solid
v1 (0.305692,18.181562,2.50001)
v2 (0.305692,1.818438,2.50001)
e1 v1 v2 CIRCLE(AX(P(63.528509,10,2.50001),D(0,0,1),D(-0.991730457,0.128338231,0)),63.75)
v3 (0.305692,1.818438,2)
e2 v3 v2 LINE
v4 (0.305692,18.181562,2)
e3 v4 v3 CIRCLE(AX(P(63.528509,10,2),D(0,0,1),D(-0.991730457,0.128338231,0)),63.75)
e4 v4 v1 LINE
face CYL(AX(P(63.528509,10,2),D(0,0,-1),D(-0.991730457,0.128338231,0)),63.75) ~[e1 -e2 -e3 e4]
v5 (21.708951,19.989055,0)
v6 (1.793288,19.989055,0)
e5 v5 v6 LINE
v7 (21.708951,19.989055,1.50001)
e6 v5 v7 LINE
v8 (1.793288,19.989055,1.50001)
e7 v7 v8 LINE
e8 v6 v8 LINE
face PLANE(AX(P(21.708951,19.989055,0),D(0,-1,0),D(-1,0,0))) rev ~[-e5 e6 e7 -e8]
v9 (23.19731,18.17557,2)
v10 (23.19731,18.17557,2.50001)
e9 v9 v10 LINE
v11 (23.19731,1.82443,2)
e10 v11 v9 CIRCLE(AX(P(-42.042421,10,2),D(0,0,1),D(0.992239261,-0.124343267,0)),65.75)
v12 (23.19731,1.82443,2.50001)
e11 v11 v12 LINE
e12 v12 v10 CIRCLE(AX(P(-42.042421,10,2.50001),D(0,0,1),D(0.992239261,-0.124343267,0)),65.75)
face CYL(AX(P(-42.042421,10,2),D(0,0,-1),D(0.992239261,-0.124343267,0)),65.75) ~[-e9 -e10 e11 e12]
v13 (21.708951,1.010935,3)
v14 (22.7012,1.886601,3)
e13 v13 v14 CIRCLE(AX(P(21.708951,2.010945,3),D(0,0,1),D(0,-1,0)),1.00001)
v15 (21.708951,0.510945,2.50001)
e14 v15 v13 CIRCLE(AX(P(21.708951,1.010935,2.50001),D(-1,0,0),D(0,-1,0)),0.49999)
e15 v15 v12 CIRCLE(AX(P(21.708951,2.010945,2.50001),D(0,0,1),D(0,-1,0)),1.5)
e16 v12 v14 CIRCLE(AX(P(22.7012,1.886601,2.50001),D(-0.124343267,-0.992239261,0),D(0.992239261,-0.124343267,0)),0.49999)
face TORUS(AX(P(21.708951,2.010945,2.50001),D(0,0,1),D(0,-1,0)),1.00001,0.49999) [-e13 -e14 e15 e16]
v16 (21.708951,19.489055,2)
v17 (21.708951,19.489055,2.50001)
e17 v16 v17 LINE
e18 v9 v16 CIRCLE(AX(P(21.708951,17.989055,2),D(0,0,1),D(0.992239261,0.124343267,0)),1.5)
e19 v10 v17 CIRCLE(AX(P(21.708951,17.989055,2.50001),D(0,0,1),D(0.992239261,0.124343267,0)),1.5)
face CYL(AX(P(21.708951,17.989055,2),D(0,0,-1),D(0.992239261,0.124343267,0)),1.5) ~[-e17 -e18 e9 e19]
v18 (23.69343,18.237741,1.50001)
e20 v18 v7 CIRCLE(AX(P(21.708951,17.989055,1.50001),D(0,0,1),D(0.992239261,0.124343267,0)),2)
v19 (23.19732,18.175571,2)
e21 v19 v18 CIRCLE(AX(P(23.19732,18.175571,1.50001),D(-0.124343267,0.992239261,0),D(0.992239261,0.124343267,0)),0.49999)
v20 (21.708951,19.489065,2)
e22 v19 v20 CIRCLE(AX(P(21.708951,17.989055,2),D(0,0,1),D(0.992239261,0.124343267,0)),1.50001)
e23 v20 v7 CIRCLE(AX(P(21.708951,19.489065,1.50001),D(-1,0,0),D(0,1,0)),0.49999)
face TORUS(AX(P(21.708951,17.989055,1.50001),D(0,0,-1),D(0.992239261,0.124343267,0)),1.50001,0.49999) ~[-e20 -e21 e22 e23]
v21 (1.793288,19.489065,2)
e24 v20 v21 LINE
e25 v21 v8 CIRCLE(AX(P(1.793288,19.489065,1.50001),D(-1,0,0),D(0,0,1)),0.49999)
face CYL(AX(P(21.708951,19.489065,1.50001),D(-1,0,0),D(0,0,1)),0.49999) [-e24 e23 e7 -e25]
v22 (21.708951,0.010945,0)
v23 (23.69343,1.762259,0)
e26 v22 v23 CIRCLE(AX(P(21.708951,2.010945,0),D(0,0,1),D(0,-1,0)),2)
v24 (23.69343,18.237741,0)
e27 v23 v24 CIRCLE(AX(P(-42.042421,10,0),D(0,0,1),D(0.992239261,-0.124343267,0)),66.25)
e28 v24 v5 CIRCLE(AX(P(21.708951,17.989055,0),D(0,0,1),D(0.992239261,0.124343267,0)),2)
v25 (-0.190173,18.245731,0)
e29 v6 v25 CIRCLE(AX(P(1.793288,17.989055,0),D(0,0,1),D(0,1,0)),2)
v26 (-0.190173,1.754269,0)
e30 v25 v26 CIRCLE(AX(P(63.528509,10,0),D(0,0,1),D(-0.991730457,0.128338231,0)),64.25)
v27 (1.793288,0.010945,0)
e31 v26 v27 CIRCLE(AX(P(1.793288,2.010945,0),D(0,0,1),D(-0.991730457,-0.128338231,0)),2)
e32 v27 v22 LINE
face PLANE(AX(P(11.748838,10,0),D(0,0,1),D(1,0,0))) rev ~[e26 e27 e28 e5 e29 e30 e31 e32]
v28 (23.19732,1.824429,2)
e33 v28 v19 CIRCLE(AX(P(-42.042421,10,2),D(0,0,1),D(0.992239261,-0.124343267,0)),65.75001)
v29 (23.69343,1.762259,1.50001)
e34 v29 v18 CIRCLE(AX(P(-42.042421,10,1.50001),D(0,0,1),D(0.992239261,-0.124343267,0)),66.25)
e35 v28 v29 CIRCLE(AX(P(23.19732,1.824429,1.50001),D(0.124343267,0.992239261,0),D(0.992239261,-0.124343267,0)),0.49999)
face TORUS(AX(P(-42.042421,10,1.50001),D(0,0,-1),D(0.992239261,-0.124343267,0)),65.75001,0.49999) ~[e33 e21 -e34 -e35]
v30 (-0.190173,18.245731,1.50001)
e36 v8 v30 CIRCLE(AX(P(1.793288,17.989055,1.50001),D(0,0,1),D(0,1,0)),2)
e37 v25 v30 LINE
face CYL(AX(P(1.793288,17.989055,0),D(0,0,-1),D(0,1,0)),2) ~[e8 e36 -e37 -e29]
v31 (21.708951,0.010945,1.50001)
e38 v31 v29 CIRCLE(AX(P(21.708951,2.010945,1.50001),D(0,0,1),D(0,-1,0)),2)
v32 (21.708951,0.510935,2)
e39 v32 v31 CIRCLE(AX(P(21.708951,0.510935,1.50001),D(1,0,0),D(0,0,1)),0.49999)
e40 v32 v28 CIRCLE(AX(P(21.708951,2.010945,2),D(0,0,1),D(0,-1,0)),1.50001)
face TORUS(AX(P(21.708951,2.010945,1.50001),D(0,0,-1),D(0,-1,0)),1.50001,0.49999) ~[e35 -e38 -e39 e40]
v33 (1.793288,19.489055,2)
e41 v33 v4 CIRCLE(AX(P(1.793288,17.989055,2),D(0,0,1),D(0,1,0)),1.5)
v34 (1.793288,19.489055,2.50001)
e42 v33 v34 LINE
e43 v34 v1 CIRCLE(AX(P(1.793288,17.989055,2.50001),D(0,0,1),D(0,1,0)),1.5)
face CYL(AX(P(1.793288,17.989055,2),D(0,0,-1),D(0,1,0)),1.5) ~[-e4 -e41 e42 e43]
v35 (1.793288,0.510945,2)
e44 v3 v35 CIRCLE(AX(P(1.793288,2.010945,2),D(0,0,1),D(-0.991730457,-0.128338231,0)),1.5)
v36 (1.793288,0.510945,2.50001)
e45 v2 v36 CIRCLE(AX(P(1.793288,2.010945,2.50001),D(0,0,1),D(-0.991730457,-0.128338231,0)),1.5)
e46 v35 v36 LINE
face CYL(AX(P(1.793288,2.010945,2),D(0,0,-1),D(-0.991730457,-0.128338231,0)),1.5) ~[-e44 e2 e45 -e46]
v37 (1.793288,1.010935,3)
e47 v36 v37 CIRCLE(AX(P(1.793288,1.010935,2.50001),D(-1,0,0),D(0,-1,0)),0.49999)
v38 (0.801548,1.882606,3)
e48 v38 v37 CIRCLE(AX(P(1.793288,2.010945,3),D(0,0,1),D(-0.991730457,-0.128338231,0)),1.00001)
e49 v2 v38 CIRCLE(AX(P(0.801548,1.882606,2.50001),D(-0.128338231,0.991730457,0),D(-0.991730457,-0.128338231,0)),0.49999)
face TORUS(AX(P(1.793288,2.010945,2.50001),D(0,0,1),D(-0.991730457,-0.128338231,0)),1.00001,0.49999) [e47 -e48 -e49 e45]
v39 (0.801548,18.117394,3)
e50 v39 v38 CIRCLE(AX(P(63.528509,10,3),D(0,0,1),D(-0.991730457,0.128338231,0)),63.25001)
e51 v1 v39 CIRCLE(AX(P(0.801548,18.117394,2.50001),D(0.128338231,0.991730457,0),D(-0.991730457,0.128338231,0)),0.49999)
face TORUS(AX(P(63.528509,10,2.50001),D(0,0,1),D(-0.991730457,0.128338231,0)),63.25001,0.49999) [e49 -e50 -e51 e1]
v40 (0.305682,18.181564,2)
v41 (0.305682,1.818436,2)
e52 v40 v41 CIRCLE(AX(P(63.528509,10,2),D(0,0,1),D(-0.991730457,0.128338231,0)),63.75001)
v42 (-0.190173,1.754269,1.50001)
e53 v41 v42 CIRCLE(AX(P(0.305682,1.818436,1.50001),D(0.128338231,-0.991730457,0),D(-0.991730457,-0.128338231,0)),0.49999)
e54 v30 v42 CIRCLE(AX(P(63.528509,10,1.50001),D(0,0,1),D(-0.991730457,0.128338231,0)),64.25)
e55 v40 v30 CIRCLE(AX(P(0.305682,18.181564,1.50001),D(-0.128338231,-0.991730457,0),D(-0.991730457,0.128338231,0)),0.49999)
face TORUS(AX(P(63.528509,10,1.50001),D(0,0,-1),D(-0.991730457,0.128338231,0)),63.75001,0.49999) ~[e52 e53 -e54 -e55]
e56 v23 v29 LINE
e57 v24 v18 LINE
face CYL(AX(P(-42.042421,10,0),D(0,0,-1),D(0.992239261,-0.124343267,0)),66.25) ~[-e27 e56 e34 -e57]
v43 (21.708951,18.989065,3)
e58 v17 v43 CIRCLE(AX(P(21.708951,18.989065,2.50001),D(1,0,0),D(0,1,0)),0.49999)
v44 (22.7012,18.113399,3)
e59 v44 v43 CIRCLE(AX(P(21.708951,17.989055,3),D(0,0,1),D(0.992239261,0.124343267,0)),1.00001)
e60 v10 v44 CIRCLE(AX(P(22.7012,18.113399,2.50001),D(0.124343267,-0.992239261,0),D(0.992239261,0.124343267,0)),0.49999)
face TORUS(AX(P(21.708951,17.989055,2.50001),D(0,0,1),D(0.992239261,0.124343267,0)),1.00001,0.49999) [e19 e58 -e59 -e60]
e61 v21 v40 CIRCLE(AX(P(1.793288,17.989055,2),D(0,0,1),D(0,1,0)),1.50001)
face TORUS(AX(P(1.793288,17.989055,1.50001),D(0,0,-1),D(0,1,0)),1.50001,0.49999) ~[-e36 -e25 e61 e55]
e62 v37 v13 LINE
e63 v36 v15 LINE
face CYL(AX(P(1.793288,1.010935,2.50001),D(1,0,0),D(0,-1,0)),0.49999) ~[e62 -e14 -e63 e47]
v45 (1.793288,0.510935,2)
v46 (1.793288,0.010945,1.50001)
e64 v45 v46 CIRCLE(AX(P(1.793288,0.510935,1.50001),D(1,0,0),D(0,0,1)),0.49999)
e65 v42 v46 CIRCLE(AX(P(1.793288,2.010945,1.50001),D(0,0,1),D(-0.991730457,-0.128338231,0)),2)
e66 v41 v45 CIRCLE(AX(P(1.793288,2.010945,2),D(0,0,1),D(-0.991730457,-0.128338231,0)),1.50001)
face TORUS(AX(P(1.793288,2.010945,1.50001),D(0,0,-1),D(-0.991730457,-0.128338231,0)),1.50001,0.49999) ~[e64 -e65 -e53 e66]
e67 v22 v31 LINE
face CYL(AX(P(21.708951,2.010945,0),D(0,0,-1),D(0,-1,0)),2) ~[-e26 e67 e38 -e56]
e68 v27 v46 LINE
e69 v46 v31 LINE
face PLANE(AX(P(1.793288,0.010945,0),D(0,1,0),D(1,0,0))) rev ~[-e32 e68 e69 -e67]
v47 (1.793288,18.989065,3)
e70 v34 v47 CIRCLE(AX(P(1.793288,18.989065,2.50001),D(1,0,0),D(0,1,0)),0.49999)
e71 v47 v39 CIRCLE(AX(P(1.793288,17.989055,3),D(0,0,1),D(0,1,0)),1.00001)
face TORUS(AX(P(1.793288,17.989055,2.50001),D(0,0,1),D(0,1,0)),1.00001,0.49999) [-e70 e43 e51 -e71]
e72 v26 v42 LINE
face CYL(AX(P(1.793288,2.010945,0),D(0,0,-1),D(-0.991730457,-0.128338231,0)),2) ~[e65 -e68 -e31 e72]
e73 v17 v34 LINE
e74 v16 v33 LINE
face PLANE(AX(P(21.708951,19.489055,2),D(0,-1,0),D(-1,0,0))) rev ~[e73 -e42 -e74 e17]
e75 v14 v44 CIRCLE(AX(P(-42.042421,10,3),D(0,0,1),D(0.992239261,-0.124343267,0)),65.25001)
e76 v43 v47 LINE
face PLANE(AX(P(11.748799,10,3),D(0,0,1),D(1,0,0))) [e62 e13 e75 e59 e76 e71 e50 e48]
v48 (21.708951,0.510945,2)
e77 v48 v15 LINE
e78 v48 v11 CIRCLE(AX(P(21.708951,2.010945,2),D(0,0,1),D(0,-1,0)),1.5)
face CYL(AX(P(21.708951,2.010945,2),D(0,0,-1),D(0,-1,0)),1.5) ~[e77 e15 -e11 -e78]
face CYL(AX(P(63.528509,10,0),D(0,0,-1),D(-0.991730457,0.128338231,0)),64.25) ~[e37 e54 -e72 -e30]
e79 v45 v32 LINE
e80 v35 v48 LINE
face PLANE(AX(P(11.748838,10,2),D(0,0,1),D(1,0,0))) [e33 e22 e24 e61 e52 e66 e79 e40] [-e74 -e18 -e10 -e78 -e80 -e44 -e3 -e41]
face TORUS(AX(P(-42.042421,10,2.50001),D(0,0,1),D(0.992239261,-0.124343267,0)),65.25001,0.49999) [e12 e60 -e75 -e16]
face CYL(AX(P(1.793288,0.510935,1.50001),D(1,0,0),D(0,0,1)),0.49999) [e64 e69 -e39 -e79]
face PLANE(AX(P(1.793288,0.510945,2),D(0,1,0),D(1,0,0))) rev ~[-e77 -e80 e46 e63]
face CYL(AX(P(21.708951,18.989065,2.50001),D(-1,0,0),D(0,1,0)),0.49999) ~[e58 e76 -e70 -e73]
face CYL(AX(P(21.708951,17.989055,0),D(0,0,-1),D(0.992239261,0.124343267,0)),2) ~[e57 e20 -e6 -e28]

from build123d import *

# Parameters (mm, degrees)
F1_DEPTH = 2
F3_DEPTH = 1
F4_R     = 0.49999


# Not quite as in the source:
# - a fillet or chamfer is up to 0.001 mm smaller than in the source, because OpenCascade refuses the exact size
# - a feature names something its author has since deleted; it is built from what else it names


with BuildPart() as f1:
    # F0 (on Top) → F1 (new body)
    with BuildSketch(Plane.XY):
        with BuildLine():
            ThreePointArc((23.6934297445, 1.7622585683), (24.2075786729, 10), (23.6934297445, 18.2377414317))
            ThreePointArc((23.6934297445, 18.2377414317), (23.0323232276, 19.4886170119), (21.7089512216, 19.9890548979))
            Line((21.7089512216, 19.9890548979), (1.7932879128, 19.9890548979))
            ThreePointArc((1.7932879128, 19.9890548979), (0.4729381343, 19.491278737), (-0.1901730003, 18.2457313605))
            ThreePointArc((-0.1901730003, 18.2457313605), (-0.7214911689, 10), (-0.1901730003, 1.7542686395))
            ThreePointArc((-0.1901730003, 1.7542686395), (0.4729381343, 0.508721263), (1.7932879128, 0.0109451021))
            Line((1.7932879128, 0.0109451021), (21.7089512216, 0.0109451021))
            ThreePointArc((21.7089512216, 0.0109451021), (23.0323232276, 0.5113829881), (23.6934297445, 1.7622585683))
        make_face()
    extrude(amount=F1_DEPTH)

    # F2 (on face) → F3 (join)
    with BuildSketch(Plane.XY.offset(2)):
        with BuildLine():
            Line((21.7089512216, 19.4890548979), (1.7932879128, 19.4890548979))
            ThreePointArc((1.7932879128, 19.4890548979), (0.8030255789, 19.1157227772), (0.305692228, 18.1815622449))
            ThreePointArc((0.305692228, 18.1815622449), (-0.2214911689, 10), (0.305692228, 1.8184377551))
            ThreePointArc((0.305692228, 1.8184377551), (0.8030255789, 0.8842772228), (1.7932879128, 0.5109451021))
            Line((1.7932879128, 0.5109451021), (21.7089512216, 0.5109451021))
            ThreePointArc((21.7089512216, 0.5109451021), (22.7014802261, 0.8862735166), (23.1973101138, 1.8244302017))
            ThreePointArc((23.1973101138, 1.8244302017), (23.7075786729, 10), (23.1973101138, 18.1755697983))
            ThreePointArc((23.1973101138, 18.1755697983), (22.7014802261, 19.1137264834), (21.7089512216, 19.4890548979))
        make_face()
    extrude(amount=F3_DEPTH)

    # F4 (radius 0.5 in the source; OpenCascade refuses exactly that, so slightly less here)
    f4_edges = [f1.edges().sort_by_distance(p)[0] for p in [
        (11.75112, 0.010945, 2),
        (11.75112, 19.989055, 2),
        (23.032323, 0.511383, 2),
        (0.472938, 0.508721, 2),
        (24.207579, 10, 2),
        (-0.721491, 10, 2),
        (0.472938, 19.491279, 2),
        (23.032323, 19.488617, 2),
        (11.75112, 0.510945, 3),
        (0.803026, 0.884277, 3),
        (-0.221491, 10, 3),
        (11.75112, 19.489055, 3),
        (22.70148, 19.113726, 3),
        (23.707579, 10, 3),
        (0.803026, 19.115723, 3),
        (22.70148, 0.886274, 3),
    ]]
    fillet(f4_edges, radius=F4_R)


solid = f1.part
